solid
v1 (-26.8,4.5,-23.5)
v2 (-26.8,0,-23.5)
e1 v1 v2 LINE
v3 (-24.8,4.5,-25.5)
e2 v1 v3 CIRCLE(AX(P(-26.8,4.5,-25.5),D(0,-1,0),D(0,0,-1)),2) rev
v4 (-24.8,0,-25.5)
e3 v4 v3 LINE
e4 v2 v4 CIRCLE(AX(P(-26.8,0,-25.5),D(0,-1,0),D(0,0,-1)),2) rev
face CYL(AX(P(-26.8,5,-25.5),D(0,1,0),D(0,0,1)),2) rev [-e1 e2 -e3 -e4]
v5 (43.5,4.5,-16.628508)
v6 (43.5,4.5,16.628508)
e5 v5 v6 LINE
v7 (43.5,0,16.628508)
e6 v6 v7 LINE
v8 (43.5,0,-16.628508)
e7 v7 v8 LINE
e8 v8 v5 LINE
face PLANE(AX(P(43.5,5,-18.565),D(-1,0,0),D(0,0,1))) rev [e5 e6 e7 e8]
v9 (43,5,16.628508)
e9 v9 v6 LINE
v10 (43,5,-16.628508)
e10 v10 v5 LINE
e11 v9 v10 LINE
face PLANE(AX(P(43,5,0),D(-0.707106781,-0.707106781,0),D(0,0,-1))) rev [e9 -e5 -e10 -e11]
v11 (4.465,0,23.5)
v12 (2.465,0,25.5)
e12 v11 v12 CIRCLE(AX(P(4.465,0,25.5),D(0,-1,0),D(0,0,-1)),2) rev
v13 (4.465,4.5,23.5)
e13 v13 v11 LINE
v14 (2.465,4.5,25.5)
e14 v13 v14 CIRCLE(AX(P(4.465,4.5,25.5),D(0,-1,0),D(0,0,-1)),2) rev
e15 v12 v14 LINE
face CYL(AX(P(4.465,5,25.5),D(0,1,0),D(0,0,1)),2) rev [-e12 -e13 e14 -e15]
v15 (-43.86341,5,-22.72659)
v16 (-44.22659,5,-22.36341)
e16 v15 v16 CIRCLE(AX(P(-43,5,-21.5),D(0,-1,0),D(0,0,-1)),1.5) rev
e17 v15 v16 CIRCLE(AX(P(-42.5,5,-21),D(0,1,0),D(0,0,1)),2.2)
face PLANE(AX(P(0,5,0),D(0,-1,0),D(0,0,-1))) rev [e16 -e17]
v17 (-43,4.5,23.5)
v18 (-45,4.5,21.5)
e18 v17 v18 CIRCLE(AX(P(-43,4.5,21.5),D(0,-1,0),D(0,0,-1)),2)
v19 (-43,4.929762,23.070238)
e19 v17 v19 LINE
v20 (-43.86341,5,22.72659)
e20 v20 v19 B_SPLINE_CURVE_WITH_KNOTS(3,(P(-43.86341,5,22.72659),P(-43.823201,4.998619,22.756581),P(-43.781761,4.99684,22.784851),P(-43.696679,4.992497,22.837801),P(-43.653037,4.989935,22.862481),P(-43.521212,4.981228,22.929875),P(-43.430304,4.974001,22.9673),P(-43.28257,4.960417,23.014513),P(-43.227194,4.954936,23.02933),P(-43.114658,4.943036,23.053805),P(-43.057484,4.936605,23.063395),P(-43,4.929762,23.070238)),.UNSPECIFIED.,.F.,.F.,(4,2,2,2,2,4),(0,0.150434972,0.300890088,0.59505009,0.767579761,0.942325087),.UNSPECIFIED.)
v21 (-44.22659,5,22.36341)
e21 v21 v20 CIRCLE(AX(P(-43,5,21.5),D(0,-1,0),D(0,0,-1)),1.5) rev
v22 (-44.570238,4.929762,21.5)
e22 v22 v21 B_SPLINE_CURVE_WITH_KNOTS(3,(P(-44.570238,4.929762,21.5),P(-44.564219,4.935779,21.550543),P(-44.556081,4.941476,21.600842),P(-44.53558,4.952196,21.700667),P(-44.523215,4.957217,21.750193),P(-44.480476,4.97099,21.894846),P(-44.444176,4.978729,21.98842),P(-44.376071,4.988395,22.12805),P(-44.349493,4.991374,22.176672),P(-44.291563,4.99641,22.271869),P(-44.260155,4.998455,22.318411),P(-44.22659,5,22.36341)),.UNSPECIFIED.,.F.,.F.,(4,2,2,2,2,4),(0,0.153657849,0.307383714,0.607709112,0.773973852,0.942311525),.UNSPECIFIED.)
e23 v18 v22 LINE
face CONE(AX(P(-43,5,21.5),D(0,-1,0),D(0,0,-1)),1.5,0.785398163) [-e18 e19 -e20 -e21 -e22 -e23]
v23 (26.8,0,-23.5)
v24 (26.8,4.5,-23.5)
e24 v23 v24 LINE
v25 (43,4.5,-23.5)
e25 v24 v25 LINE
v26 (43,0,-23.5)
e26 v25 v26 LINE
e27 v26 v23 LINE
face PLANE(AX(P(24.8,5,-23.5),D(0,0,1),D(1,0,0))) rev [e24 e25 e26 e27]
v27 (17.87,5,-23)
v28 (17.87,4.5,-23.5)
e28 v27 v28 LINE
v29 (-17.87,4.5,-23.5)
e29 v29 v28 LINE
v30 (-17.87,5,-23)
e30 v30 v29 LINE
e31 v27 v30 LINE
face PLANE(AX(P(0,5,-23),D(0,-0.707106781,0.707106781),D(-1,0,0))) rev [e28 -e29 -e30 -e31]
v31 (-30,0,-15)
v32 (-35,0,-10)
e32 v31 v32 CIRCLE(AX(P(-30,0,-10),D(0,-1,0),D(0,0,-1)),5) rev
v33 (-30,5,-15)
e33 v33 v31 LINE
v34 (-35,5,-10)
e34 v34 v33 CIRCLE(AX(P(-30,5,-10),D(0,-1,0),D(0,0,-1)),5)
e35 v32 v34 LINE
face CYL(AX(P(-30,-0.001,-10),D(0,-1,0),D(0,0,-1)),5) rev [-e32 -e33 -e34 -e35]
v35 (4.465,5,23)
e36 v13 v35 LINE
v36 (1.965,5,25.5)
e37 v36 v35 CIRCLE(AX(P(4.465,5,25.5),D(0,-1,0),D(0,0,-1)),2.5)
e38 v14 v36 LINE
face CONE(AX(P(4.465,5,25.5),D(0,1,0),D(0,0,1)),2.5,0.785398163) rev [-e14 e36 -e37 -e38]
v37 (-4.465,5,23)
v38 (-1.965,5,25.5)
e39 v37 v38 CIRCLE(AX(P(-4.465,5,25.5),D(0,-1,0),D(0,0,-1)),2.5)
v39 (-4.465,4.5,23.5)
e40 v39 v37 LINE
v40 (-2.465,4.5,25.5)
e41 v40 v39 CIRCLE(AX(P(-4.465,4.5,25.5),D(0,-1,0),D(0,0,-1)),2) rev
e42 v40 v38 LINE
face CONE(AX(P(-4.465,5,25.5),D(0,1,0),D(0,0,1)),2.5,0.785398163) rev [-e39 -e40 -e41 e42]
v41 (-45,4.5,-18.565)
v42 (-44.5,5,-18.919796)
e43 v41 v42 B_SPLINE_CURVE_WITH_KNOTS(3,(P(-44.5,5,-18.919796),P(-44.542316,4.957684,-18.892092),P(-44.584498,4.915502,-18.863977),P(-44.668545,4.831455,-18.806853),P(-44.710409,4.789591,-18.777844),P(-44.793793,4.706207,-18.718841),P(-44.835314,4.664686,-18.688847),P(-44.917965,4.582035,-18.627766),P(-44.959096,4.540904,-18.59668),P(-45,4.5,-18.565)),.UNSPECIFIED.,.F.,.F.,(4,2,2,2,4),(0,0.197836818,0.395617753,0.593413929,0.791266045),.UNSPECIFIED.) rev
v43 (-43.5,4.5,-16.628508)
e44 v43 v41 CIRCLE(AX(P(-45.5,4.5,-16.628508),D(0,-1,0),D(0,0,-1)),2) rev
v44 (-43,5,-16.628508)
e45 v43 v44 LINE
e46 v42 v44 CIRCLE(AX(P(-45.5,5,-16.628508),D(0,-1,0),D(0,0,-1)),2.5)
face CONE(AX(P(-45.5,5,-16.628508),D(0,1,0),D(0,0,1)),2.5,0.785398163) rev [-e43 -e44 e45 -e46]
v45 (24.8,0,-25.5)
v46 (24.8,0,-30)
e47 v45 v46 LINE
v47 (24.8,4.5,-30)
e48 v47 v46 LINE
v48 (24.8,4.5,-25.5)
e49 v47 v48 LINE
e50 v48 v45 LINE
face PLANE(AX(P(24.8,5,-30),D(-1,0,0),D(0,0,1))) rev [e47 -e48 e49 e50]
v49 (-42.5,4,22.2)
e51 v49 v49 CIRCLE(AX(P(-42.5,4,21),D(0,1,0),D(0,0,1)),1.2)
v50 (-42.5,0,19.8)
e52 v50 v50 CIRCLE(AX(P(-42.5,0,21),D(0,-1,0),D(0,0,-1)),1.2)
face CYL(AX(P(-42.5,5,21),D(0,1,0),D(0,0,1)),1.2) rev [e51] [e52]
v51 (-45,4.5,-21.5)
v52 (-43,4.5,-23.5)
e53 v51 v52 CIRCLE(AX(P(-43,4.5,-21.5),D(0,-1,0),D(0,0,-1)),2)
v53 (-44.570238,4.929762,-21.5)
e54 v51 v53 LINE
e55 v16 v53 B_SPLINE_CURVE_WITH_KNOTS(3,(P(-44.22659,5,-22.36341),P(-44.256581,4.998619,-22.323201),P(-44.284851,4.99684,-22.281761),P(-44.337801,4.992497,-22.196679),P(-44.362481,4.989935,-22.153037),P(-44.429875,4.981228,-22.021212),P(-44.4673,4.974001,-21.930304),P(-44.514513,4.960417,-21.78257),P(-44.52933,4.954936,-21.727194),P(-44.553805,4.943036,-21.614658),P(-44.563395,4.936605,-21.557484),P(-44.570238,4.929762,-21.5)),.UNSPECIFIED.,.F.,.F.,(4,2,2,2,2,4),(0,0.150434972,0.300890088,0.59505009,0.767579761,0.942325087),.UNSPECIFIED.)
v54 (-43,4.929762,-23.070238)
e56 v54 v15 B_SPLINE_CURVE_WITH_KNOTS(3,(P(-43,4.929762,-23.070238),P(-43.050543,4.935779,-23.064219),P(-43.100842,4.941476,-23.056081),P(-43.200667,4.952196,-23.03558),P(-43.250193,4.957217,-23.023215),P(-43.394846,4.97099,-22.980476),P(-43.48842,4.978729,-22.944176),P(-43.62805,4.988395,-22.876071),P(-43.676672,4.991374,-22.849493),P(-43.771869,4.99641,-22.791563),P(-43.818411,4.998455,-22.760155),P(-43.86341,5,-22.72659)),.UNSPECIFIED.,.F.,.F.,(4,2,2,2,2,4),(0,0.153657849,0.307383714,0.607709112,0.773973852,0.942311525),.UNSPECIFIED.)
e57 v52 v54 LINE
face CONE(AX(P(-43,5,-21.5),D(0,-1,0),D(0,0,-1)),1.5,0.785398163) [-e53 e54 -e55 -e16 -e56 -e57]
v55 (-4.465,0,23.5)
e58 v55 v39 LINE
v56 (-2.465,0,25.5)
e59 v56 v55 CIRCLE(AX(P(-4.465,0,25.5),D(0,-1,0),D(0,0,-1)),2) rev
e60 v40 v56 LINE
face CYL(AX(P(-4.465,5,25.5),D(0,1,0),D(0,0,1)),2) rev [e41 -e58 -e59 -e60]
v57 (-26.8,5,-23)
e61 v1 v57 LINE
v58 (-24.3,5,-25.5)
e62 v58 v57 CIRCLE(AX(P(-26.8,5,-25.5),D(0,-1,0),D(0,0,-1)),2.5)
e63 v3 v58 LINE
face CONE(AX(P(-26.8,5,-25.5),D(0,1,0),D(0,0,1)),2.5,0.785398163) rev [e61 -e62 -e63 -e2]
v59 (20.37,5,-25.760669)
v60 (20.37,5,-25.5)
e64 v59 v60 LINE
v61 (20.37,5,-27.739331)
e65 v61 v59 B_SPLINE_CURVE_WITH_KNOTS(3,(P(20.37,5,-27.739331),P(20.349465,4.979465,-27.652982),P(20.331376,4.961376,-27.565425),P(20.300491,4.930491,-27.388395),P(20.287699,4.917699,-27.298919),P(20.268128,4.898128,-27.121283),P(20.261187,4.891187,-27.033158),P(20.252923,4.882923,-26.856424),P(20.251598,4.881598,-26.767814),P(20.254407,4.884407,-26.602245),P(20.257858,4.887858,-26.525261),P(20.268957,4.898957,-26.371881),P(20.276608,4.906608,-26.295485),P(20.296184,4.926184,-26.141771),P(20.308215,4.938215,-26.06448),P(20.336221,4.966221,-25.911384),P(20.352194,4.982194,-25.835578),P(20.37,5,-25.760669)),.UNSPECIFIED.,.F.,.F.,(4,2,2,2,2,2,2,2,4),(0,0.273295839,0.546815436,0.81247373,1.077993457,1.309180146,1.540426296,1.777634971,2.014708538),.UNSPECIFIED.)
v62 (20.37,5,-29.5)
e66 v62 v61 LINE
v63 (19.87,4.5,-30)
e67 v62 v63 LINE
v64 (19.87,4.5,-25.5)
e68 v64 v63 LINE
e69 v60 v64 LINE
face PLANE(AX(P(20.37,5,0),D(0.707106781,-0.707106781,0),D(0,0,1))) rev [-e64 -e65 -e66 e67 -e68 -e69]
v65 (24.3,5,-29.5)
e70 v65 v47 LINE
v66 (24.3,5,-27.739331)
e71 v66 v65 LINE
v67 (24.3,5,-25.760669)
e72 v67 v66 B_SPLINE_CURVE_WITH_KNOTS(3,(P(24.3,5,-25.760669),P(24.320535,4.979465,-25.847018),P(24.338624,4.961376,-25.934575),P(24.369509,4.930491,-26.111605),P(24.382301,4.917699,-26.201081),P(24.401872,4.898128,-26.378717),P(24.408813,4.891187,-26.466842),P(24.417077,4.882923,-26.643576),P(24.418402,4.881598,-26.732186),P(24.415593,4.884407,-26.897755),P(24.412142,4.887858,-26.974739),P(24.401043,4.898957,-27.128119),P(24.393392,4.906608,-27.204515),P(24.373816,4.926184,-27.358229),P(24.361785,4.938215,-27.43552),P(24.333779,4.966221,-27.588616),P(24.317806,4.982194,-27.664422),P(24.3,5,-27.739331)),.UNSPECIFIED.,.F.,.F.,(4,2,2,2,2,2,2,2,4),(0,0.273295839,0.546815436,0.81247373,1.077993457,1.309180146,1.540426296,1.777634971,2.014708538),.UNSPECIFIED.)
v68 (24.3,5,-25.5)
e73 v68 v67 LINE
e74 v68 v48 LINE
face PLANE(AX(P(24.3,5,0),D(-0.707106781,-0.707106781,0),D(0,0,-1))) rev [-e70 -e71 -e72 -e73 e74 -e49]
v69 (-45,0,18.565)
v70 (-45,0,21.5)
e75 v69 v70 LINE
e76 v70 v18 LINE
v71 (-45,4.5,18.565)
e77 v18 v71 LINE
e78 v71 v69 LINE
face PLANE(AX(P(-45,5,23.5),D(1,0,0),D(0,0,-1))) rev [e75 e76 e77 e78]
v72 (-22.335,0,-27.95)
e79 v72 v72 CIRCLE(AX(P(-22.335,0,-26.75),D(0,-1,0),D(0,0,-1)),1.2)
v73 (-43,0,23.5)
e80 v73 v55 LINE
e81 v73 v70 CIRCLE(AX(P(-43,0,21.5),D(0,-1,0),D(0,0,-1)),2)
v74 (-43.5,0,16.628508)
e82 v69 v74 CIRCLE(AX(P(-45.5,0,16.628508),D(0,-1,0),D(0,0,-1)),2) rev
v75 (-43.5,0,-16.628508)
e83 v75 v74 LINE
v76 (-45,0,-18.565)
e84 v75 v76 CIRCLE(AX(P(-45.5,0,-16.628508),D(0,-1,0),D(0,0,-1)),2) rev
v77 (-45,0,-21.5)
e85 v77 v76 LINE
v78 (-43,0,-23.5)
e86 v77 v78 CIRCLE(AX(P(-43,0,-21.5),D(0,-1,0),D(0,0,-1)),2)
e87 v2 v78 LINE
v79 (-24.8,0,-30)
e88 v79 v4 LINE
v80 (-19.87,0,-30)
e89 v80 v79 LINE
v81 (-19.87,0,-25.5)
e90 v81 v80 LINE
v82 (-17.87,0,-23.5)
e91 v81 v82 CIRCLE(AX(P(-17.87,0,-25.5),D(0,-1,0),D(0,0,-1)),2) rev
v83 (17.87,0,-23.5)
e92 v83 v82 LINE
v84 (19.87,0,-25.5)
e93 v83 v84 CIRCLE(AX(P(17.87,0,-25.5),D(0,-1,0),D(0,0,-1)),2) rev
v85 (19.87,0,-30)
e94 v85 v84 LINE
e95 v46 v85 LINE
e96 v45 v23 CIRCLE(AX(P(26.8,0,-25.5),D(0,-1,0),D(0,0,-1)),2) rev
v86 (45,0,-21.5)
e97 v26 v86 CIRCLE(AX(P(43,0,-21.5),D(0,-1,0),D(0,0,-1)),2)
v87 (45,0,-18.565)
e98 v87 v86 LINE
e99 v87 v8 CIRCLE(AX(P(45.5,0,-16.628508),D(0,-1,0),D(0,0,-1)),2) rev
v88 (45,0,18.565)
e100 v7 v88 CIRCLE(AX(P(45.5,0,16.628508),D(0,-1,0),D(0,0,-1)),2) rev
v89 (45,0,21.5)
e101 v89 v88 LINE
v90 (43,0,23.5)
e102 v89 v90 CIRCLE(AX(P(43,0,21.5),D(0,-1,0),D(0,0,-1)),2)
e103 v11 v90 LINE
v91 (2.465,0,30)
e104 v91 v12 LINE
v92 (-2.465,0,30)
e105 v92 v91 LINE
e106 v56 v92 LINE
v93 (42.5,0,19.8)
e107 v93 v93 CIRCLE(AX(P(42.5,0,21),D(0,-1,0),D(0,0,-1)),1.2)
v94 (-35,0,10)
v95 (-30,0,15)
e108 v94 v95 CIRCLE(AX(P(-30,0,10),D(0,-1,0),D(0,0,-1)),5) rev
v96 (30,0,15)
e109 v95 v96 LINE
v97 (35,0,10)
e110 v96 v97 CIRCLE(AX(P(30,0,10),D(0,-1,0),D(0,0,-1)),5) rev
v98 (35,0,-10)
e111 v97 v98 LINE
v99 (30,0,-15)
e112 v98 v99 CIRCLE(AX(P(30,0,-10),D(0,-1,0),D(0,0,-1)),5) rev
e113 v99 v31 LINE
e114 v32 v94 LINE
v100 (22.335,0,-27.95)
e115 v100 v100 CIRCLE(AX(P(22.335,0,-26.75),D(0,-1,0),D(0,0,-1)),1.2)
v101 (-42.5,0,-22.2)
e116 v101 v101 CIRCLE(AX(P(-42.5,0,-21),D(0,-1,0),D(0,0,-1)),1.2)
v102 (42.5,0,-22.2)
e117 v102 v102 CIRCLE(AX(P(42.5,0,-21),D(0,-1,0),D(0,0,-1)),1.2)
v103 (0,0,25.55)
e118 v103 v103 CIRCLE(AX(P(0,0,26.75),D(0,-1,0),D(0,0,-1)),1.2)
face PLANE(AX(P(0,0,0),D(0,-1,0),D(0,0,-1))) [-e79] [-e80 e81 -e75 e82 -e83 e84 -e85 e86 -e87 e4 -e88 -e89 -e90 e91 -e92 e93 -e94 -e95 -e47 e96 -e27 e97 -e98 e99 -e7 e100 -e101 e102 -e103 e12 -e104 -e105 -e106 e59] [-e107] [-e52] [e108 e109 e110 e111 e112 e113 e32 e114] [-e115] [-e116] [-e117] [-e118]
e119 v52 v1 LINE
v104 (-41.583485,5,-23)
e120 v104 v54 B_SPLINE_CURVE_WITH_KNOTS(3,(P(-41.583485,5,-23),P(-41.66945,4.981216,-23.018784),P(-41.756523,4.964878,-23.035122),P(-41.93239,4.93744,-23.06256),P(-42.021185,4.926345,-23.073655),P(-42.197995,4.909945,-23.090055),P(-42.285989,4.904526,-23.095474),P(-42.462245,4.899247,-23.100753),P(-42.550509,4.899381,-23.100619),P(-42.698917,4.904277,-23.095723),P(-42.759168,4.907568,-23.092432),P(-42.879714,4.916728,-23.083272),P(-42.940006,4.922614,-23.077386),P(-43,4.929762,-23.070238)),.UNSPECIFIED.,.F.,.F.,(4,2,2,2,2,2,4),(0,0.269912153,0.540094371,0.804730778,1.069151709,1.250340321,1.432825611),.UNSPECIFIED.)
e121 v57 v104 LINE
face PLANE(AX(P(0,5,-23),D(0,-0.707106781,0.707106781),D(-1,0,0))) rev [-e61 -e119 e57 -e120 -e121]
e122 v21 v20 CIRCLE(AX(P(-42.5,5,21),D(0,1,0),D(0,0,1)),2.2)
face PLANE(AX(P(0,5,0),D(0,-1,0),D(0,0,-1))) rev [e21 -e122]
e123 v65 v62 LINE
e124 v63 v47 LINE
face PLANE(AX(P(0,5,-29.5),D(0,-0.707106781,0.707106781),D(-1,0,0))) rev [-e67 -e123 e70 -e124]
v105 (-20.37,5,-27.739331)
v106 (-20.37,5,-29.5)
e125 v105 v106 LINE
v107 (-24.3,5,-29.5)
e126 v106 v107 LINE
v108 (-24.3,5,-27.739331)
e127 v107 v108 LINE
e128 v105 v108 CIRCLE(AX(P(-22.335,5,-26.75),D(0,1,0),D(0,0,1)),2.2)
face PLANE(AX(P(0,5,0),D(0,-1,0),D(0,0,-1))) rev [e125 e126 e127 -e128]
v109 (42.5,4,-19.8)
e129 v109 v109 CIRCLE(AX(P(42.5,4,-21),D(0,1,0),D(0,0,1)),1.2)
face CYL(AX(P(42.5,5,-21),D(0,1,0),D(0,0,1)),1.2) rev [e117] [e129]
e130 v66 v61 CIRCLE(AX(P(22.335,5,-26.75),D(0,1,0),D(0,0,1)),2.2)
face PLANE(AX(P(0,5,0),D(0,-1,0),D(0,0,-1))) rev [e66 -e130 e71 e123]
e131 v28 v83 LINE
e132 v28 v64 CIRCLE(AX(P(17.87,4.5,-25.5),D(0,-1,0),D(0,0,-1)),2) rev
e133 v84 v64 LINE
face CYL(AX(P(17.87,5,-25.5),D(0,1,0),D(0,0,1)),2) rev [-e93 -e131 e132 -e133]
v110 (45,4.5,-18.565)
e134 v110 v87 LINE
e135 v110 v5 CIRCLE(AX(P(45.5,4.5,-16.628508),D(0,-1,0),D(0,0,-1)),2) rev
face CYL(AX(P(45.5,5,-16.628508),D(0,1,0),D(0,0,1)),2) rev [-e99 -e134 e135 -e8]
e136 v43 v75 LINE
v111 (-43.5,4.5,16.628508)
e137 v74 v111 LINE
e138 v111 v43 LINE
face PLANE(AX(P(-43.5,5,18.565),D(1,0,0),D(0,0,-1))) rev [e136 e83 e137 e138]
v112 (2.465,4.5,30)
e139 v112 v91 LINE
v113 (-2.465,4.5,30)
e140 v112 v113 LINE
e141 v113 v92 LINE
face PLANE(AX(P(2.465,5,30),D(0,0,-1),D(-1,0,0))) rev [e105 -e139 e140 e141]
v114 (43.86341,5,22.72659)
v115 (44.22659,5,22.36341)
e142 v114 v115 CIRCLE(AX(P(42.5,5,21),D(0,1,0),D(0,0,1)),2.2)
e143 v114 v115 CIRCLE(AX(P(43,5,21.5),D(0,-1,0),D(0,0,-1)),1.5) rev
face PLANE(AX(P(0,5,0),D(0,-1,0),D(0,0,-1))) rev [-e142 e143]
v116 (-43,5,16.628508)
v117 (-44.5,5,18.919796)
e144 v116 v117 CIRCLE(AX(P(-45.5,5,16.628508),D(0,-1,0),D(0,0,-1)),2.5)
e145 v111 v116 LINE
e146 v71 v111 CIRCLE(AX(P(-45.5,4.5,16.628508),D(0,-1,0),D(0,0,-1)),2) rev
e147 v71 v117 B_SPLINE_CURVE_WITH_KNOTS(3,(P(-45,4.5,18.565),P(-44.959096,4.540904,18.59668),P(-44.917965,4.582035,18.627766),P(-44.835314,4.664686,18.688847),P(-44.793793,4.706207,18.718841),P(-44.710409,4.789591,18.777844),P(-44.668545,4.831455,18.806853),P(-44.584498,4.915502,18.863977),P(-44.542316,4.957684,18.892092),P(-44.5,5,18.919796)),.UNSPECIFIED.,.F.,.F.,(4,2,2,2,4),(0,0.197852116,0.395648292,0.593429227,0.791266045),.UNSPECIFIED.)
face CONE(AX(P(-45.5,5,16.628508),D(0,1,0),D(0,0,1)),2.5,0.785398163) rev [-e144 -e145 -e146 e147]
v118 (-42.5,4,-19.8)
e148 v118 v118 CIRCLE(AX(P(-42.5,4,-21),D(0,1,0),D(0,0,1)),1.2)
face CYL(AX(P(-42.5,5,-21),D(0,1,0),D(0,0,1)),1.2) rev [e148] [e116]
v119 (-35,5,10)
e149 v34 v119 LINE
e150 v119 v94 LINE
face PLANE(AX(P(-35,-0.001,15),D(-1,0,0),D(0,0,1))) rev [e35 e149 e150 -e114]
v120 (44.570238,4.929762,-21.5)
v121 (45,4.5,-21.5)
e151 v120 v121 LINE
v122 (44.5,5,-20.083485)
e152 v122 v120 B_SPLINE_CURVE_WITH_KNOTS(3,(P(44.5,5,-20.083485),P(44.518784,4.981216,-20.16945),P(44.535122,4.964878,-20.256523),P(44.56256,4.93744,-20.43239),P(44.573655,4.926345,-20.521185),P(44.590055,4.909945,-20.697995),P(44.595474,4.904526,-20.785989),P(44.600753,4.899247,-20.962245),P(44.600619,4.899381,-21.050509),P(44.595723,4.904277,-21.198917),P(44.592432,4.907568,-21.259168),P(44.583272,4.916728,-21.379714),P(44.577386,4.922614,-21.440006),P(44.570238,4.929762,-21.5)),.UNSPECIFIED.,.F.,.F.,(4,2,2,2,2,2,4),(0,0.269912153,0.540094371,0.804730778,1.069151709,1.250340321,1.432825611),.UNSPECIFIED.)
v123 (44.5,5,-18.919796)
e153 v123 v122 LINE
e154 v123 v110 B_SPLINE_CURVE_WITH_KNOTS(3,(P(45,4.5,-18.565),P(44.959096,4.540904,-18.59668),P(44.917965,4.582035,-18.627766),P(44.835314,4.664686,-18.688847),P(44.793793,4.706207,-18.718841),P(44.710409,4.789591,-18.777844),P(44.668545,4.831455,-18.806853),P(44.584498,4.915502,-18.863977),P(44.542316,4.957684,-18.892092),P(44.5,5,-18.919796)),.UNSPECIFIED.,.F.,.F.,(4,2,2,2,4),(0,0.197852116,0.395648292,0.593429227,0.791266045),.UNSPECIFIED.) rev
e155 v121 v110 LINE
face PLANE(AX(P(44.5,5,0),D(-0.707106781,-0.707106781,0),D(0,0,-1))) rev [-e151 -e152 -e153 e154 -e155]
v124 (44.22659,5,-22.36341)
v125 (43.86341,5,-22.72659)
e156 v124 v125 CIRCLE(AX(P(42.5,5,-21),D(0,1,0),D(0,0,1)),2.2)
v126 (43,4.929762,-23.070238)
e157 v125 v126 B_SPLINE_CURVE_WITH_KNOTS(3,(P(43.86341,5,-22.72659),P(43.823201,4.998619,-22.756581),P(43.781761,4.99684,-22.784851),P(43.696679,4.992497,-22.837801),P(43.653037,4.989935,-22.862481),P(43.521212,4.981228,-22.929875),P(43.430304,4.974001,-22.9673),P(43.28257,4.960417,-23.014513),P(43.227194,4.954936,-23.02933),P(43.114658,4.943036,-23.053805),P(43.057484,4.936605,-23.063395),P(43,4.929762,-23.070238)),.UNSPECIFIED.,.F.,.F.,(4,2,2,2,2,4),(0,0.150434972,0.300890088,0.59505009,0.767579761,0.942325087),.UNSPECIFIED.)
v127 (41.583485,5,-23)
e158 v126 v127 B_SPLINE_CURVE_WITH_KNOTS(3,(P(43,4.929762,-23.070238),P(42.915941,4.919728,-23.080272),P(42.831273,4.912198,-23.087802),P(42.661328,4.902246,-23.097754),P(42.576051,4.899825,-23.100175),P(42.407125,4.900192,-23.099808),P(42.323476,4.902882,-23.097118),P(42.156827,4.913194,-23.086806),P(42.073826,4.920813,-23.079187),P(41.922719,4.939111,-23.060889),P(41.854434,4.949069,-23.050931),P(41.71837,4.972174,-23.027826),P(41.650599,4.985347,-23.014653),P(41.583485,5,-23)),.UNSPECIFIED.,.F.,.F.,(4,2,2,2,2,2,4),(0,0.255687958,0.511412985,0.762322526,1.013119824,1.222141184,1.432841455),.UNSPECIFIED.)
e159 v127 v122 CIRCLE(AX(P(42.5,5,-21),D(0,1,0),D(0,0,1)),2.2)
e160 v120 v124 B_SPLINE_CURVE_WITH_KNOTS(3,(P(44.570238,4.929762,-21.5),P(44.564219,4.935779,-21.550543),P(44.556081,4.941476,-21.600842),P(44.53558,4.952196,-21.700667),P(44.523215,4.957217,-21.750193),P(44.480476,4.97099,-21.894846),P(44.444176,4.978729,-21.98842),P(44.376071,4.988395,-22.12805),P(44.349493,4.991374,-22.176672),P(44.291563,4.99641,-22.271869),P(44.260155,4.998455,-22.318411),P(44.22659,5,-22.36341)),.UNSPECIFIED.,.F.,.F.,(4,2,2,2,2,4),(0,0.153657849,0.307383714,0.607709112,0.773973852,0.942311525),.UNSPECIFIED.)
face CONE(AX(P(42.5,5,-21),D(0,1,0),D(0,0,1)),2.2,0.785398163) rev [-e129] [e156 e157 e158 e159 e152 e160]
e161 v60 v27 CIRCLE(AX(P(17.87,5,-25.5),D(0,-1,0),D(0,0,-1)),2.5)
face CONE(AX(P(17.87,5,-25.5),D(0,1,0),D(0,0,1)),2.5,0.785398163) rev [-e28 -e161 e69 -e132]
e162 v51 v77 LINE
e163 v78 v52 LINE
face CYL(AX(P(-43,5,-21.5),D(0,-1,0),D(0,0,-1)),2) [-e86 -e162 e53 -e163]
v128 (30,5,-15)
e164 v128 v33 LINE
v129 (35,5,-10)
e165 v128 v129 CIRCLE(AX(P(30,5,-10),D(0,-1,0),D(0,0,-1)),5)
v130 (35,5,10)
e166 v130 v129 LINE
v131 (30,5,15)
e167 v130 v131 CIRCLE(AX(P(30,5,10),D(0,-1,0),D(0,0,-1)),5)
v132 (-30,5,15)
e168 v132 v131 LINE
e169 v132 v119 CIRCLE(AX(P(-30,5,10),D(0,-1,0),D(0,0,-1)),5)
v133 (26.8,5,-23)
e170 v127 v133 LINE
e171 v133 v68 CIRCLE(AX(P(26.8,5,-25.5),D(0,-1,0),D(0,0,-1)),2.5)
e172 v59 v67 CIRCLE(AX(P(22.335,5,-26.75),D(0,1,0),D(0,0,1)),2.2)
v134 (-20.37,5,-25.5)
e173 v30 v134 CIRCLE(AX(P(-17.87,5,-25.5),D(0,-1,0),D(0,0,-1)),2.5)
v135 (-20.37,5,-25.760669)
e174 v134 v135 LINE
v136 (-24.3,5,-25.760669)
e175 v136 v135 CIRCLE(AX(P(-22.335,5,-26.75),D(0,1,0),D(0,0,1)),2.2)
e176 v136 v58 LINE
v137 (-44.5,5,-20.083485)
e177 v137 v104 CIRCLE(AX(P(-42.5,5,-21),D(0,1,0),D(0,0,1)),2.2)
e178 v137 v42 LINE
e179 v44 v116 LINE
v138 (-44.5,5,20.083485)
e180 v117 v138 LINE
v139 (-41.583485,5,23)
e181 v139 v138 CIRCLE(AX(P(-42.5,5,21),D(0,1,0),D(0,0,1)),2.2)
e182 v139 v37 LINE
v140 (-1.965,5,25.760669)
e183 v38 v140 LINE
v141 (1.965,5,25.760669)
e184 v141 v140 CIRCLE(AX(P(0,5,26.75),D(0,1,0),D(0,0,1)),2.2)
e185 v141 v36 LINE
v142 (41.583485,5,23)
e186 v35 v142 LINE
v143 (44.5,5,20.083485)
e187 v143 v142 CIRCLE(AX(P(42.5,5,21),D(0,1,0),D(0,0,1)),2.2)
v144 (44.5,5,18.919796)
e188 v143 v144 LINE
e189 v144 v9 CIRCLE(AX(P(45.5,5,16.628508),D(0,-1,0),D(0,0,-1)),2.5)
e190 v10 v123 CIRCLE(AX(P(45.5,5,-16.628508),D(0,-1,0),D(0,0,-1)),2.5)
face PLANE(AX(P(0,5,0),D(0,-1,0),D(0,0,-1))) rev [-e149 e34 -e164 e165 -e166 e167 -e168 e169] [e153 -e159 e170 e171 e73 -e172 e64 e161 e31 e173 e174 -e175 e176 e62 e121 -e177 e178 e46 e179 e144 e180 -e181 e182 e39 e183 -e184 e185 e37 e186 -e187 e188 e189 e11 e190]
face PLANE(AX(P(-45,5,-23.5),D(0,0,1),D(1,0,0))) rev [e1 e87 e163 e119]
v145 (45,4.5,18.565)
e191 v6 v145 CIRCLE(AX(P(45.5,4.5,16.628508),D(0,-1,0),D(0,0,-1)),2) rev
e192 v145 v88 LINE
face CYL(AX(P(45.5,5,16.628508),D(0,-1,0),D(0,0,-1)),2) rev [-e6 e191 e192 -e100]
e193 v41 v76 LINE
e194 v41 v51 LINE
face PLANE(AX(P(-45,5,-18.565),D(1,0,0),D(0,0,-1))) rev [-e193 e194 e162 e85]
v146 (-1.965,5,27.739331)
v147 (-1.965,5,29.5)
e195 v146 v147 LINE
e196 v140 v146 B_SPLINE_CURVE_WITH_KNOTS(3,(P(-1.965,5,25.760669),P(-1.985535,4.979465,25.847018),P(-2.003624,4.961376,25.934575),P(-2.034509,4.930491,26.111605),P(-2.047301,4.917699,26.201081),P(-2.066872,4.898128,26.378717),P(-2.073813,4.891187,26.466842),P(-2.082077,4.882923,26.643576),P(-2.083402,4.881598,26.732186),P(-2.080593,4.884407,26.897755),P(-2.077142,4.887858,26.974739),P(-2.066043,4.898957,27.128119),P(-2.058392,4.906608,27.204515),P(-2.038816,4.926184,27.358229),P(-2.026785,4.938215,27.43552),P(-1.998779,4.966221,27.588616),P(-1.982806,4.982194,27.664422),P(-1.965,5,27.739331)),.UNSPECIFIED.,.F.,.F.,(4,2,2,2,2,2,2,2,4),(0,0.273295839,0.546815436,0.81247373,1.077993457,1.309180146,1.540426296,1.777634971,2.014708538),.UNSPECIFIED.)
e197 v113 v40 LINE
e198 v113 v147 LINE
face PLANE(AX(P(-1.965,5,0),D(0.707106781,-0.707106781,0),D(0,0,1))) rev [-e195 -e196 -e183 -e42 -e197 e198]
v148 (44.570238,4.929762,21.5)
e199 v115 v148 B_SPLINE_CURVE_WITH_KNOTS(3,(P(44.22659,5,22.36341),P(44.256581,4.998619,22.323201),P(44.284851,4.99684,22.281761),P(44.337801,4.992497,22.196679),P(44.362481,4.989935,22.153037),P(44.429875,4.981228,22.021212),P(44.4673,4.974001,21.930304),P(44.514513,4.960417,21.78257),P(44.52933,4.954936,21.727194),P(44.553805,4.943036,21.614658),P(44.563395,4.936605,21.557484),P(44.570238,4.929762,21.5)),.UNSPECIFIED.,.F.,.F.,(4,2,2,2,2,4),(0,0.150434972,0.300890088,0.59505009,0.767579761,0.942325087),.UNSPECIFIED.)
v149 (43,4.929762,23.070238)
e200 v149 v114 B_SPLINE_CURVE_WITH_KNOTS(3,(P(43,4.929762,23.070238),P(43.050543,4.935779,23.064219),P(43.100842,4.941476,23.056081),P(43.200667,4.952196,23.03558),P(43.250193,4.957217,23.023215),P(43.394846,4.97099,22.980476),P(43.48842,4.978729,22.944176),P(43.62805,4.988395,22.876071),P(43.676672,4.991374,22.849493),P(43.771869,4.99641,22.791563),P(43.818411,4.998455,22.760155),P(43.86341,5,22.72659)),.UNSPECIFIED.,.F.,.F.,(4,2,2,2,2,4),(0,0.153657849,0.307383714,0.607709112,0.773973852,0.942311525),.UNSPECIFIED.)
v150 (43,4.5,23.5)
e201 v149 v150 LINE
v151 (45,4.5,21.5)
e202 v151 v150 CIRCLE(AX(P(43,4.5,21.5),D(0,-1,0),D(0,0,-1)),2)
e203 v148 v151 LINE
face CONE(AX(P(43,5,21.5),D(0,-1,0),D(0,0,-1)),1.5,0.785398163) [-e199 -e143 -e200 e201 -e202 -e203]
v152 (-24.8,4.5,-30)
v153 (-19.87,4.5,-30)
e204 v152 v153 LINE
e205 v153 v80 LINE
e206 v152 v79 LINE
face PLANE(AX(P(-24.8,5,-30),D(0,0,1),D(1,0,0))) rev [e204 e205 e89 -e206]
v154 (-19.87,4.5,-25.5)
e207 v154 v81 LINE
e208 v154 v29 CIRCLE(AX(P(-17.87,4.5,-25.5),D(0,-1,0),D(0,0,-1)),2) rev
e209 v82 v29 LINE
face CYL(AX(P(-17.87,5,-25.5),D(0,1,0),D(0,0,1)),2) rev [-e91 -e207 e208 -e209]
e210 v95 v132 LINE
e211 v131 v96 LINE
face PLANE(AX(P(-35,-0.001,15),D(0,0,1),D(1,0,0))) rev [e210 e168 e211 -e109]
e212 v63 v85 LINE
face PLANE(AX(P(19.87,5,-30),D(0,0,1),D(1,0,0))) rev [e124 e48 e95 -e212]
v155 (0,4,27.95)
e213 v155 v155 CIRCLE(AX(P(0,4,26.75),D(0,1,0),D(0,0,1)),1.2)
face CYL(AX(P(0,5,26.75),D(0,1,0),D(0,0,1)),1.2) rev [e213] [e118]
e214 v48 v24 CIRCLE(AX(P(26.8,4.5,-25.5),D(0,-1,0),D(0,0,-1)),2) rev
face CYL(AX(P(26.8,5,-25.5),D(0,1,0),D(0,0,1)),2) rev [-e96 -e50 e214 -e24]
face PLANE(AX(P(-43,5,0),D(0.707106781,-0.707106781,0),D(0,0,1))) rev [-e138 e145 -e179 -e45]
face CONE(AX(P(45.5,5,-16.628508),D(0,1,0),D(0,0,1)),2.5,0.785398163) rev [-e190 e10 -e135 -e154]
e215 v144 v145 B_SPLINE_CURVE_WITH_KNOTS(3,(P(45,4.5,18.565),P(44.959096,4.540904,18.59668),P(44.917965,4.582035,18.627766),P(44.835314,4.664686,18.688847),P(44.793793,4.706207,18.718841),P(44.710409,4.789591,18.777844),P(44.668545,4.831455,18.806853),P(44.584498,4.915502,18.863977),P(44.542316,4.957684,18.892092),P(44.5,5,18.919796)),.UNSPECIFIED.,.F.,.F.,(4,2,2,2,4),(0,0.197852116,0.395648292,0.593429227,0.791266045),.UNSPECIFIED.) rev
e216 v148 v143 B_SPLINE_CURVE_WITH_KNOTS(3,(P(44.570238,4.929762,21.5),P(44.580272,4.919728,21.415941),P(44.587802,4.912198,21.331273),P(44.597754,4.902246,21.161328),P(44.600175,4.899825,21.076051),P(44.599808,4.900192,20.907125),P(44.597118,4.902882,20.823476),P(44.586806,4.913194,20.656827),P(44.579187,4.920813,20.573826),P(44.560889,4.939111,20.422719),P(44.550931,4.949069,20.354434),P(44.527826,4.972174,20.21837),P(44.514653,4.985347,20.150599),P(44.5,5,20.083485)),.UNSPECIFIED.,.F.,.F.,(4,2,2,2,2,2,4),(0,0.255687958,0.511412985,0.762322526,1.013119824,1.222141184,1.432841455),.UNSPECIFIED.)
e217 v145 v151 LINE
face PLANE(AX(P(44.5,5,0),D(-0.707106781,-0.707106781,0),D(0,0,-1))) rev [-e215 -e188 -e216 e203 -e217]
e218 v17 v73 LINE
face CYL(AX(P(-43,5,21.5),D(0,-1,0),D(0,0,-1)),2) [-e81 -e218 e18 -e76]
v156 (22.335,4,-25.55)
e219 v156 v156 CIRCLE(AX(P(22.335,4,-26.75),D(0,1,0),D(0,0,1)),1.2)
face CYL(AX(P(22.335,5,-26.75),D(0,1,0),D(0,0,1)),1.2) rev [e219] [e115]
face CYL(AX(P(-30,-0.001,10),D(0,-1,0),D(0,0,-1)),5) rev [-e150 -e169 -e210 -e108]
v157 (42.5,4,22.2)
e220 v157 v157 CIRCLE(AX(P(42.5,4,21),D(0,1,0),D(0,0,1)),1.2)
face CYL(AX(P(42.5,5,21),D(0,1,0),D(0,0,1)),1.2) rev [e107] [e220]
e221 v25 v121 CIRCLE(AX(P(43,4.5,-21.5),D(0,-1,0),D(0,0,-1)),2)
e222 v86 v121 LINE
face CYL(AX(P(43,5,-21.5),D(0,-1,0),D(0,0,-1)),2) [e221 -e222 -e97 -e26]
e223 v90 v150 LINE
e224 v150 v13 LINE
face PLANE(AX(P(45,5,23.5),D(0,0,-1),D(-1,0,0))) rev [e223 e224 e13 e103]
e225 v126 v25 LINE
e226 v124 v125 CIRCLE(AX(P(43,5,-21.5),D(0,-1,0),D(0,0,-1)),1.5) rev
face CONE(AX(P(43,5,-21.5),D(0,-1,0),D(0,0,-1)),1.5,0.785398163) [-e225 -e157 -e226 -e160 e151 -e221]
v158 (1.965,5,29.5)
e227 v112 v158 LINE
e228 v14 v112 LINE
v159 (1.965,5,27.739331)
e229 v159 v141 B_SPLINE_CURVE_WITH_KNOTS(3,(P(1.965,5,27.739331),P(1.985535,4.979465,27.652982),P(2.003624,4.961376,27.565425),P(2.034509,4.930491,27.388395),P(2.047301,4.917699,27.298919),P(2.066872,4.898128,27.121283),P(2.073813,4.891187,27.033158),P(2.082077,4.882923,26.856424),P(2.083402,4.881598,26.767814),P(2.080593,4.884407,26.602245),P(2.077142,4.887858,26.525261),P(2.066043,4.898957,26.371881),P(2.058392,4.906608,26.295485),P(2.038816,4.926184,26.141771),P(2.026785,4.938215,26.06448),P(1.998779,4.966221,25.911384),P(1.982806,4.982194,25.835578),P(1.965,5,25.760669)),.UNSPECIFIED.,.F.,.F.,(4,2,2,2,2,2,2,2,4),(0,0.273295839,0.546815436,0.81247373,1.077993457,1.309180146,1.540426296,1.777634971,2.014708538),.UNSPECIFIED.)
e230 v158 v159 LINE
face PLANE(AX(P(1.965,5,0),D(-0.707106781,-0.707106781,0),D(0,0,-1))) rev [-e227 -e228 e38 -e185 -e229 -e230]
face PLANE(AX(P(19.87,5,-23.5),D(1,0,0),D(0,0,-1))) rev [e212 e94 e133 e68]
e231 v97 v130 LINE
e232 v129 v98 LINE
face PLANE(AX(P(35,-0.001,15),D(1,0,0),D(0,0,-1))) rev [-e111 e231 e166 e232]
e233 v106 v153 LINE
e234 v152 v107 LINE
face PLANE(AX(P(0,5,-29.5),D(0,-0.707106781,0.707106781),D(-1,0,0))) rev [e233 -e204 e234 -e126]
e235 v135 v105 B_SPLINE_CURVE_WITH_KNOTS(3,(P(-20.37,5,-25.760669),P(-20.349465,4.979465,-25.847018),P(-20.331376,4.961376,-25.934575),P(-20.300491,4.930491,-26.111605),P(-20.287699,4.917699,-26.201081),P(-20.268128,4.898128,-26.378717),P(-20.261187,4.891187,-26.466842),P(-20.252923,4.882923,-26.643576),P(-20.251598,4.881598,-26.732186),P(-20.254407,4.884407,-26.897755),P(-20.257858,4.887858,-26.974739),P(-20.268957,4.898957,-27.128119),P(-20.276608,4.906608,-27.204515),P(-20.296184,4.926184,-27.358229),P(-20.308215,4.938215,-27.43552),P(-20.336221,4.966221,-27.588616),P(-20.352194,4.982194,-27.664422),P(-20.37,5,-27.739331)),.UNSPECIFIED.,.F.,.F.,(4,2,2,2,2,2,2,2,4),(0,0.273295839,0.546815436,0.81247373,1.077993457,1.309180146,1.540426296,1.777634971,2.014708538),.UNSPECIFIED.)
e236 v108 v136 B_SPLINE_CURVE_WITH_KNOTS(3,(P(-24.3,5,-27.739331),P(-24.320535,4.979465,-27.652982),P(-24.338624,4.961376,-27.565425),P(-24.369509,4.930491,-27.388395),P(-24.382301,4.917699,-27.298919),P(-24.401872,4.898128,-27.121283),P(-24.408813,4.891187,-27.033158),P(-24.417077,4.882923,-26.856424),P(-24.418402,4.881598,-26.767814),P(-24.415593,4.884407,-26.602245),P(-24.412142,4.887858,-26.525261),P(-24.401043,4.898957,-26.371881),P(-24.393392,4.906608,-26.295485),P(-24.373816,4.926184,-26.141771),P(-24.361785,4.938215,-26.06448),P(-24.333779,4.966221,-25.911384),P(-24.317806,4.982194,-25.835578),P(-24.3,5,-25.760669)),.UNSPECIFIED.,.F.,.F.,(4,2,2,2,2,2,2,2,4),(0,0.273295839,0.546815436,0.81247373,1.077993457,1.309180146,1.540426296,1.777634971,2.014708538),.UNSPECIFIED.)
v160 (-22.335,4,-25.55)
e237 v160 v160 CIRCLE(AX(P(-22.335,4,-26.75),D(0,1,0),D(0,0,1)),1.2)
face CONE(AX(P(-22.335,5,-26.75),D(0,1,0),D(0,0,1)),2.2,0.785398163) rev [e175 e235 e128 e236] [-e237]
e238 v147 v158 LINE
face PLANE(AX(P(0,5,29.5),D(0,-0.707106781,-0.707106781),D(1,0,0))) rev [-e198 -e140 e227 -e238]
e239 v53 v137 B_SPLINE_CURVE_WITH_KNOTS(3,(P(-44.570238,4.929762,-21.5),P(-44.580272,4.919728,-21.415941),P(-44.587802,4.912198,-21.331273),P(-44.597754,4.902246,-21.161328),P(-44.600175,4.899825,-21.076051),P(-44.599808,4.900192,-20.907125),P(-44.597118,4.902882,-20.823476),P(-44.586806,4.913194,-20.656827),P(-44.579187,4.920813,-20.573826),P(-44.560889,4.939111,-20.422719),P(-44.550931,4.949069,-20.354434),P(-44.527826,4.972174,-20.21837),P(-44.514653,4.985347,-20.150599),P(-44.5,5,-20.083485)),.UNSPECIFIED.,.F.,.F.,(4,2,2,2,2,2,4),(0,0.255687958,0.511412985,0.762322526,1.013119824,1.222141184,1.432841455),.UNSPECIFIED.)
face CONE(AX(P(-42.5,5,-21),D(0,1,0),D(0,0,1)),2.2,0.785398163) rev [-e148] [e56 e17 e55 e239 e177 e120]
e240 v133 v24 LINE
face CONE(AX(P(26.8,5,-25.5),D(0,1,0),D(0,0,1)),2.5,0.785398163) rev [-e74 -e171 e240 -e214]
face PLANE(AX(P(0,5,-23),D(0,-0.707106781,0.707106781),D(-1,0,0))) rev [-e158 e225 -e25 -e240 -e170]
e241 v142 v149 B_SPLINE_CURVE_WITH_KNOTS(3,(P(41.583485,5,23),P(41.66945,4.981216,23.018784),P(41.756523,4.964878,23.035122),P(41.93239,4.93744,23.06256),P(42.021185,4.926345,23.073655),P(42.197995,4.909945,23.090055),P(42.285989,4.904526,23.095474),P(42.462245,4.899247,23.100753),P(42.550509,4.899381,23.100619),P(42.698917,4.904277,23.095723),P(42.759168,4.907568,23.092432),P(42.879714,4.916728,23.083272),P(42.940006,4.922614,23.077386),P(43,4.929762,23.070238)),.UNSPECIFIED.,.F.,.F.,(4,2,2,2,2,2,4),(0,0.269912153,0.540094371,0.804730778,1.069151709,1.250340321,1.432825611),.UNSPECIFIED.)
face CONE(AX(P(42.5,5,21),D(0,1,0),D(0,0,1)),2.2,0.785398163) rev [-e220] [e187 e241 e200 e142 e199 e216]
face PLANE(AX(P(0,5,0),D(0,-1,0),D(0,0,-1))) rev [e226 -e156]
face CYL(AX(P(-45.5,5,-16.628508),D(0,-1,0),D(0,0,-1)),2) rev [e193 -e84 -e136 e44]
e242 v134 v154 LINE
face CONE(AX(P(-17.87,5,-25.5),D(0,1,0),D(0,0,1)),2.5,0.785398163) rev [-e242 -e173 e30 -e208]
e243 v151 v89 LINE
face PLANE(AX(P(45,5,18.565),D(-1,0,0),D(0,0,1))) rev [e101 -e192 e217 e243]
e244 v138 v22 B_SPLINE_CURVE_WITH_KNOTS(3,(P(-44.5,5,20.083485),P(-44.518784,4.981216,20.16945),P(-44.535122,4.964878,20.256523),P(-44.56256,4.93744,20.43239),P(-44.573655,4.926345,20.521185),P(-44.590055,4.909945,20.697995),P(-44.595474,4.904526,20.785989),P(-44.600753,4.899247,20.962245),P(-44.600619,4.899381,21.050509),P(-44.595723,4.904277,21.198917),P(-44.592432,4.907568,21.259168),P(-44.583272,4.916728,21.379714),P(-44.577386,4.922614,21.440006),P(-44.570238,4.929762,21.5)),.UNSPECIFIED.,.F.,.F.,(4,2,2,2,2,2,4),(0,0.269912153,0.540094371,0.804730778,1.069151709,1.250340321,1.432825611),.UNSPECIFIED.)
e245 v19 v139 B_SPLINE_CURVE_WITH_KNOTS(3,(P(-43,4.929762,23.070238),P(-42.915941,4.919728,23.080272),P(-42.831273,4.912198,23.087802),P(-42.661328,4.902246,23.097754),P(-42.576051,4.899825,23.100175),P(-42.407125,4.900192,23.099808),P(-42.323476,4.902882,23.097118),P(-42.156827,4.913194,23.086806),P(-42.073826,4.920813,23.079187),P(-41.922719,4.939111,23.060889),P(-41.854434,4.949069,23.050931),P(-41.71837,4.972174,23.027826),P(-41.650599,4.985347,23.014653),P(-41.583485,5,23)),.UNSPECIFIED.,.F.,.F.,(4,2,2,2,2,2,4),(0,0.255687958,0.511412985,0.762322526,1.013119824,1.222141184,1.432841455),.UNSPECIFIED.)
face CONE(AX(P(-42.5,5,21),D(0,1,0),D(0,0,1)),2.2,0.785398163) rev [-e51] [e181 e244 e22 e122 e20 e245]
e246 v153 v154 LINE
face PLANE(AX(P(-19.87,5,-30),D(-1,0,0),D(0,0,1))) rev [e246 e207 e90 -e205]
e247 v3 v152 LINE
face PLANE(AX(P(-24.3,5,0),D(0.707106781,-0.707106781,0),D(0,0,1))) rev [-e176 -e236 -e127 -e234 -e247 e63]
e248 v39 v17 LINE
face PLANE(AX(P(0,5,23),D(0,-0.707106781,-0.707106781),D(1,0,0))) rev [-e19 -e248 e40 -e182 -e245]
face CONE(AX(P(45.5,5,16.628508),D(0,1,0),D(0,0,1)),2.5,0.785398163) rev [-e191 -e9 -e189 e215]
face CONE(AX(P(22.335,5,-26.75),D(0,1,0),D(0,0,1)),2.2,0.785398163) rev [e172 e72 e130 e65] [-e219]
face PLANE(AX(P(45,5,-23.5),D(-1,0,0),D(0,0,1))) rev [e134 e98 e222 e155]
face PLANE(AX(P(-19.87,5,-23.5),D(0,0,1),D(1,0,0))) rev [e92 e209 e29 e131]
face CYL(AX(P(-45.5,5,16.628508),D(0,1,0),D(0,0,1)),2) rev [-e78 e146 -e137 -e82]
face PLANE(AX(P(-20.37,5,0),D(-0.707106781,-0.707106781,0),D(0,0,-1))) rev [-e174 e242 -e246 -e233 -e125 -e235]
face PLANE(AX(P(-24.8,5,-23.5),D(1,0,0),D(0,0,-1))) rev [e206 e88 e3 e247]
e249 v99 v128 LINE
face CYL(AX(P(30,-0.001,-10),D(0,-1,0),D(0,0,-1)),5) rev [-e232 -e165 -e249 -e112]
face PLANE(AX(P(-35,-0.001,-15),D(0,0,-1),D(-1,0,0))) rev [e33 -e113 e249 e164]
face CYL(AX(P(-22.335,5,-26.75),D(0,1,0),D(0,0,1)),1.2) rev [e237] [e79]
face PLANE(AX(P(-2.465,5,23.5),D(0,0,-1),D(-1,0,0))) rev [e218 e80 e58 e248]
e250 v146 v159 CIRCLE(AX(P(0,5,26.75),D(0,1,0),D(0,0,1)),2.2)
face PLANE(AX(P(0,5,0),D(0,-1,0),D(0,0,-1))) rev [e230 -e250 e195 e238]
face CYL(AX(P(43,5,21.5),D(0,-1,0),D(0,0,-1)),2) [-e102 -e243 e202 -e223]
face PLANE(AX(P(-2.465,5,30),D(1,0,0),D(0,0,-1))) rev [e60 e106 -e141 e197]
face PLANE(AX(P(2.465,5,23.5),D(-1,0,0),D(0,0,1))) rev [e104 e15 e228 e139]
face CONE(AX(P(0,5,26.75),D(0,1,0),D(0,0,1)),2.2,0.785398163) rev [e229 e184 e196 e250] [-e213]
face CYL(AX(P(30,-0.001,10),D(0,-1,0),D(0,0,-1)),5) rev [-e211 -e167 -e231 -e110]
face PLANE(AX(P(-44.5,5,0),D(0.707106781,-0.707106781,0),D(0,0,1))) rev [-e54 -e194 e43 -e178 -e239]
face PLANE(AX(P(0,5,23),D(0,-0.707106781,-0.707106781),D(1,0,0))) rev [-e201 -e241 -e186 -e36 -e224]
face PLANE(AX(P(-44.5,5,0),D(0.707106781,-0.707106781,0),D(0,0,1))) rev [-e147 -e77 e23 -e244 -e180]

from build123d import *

# Parameters (mm, degrees)
BOSS_EXTRUDE1_DEPTH                                 = 5
CSK_FOR_M2_COUNTERSUNK_FLAT_HEAD_SCREW1_D           = 2.4
CSK_FOR_M2_COUNTERSUNK_FLAT_HEAD_SCREW1_CSINK_D     = 4.4
CSK_FOR_M2_COUNTERSUNK_FLAT_HEAD_SCREW1_CSINK_ANGLE = 90
FILLET2_R                                           = 2
CHAMFER2_SIZE                                       = 0.5
CUT_EXTRUDE1_REACH                                  = 56.314
SKETCH4_W                                           = 70
SKETCH4_H                                           = 30
FILLET3_R                                           = 5


with BuildPart() as part:
    # Sketch1 → Boss-Extrude1 (new body)
    with BuildSketch(Plane(origin=(0, 0, 0), x_dir=(1, 0, 0), z_dir=(0, 1, 0))):
        Polygon((-45, -23.5), (-45, -18.565), (-43.5, -18.565), (-43.5, 18.565), (-45, 18.565), (-45, 23.5), (-24.8, 23.5), (-24.8, 30), (-19.87, 30), (-19.87, 23.5), (19.87, 23.5), (19.87, 30), (24.8, 30), (24.8, 23.5), (45, 23.5), (45, 18.565), (43.5, 18.565), (43.5, -18.565), (45, -18.565), (45, -23.5), (2.465, -23.5), (2.465, -30), (-2.465, -30), (-2.465, -23.5), align=None)
    extrude(amount=BOSS_EXTRUDE1_DEPTH)

    # CSK for M2 Countersunk Flat Head Screw1 (through all)
    with Locations(Plane(origin=(0, 5, 0), x_dir=(1, 0, 0), z_dir=(0, 1, 0))):
        with Locations((0, -26.75), (22.335, 26.75), (-22.335, 26.75), (-42.5, 21), (-42.5, -21), (42.5, 21), (42.5, -21)):
            CounterSinkHole(CSK_FOR_M2_COUNTERSUNK_FLAT_HEAD_SCREW1_D / 2, CSK_FOR_M2_COUNTERSUNK_FLAT_HEAD_SCREW1_CSINK_D / 2, counter_sink_angle=CSK_FOR_M2_COUNTERSUNK_FLAT_HEAD_SCREW1_CSINK_ANGLE)

    # Fillet2
    # the kernel refuses this fillet: 2 mm, written as the material it adds along each edge
    with BuildSketch(Plane(origin=(-2.465, 0, 23.5), x_dir=(0, 0, 1), z_dir=(0, 1, 0))) as fillet2_piece_1:
        with BuildLine():
            CenterArc((FILLET2_R, -FILLET2_R), FILLET2_R, 90, 90)
            Line((0, -FILLET2_R), (0, 0))
            Line((0, 0), (FILLET2_R, 0))
        make_face()
    extrude(amount=5)
    with BuildSketch(Plane(origin=(-43.5, 0, 18.565), x_dir=(0, 0, -1), z_dir=(0, 1, 0)), Plane(origin=(43.5, 0, -18.565), x_dir=(0, 0, 1), z_dir=(0, 1, 0))) as fillet2_piece_2:
        with BuildLine():
            CenterArc((1.936491673, 2), FILLET2_R, 194.477512186, 75.522487814)
            Line((0, 1.5), (0, 0))
            Line((0, 0), (1.936491673, 0))
        make_face()
    extrude(amount=5)
    with BuildSketch(Plane(origin=(-43.5, 0, -18.565), x_dir=(-1, 0, 0), z_dir=(0, 1, 0)), Plane(origin=(43.5, 0, 18.565), x_dir=(1, 0, 0), z_dir=(0, 1, 0))) as fillet2_piece_3:
        with BuildLine():
            CenterArc((2, 1.936491673), FILLET2_R, 180, 75.522487814)
            Line((0, 1.936491673), (0, 0))
            Line((0, 0), (1.5, 0))
        make_face()
    extrude(amount=5)
    with BuildSketch(Plane(origin=(-24.8, 0, -23.5), x_dir=(0, 0, -1), z_dir=(0, 1, 0)), Plane(origin=(-19.87, 0, -23.5), x_dir=(1, 0, 0), z_dir=(0, 1, 0)), Plane(origin=(19.87, 0, -23.5), x_dir=(0, 0, -1), z_dir=(0, 1, 0)), Plane(origin=(24.8, 0, -23.5), x_dir=(1, 0, 0), z_dir=(0, 1, 0)), Plane(origin=(2.465, 0, 23.5), x_dir=(0, 0, 1), z_dir=(0, 1, 0))) as fillet2_piece_4:
        with BuildLine():
            CenterArc((FILLET2_R, FILLET2_R), FILLET2_R, 180, 90)
            Line((0, FILLET2_R), (0, 0))
            Line((0, 0), (FILLET2_R, 0))
        make_face()
    extrude(amount=5)
    # the kernel refuses this fillet: 2 mm, written as the material it takes off along each edge
    with BuildSketch(Plane(origin=(-45, -5, 23.5), x_dir=(0, 0, -1), z_dir=(0, 1, 0)), Plane(origin=(45, -5, -23.5), x_dir=(0, 0, 1), z_dir=(0, 1, 0)), Plane(origin=(45, -5, 23.5), x_dir=(-1, 0, 0), z_dir=(0, 1, 0))) as fillet2_2_piece_1:
        with BuildLine():
            CenterArc((FILLET2_R, -FILLET2_R), FILLET2_R, 90, 90)
            Line((0, -FILLET2_R), (0, 0))
            Line((0, 0), (FILLET2_R, 0))
        make_face()
    extrude(amount=15, mode=Mode.SUBTRACT)
    with BuildSketch(Plane(origin=(-45, -5, -23.5), x_dir=(0, 0, 1), z_dir=(0, 1, 0))) as fillet2_2_piece_2:
        with BuildLine():
            CenterArc((FILLET2_R, FILLET2_R), FILLET2_R, 180, 90)
            Line((0, FILLET2_R), (0, 0))
            Line((0, 0), (FILLET2_R, 0))
        make_face()
    extrude(amount=15, mode=Mode.SUBTRACT)

    # Chamfer2
    # the kernel refuses this chamfer: 0.5 mm, written as the material it takes off along each edge
    with BuildSketch(Plane(origin=(-2.465, 5, 31.285841494), x_dir=(1, 0, 0), z_dir=(0, 0, -1)), Plane(origin=(24.8, 5, -31.285841494), x_dir=(-1, 0, 0), z_dir=(0, 0, 1)), Plane(origin=(-19.87, 5, -31.285841494), x_dir=(-1, 0, 0), z_dir=(0, 0, 1)), Plane(origin=(19.87, 5, -25.5), x_dir=(1, 0, 0), z_dir=(0, 0, -1)), Plane(origin=(2.465, 5, 25.5), x_dir=(-1, 0, 0), z_dir=(0, 0, 1))) as chamfer2_piece_1:
        Polygon((CHAMFER2_SIZE, 0), (0, CHAMFER2_SIZE), (0, 0), align=None)
    extrude(amount=5.785841494, mode=Mode.SUBTRACT)
    with BuildSketch(Plane(origin=(-4.465, 5, 23.5), x_dir=(0, 0, -1), z_dir=(-1, 0, 0)), Plane(origin=(43, 5, 23.5), x_dir=(0, 0, -1), z_dir=(-1, 0, 0))) as chamfer2_piece_2:
        Polygon((CHAMFER2_SIZE, 0), (0, CHAMFER2_SIZE), (0, 0), align=None)
    extrude(amount=38.535, mode=Mode.SUBTRACT)
    with BuildSketch(Plane(origin=(18.584158506, 5, -30), x_dir=(0, 0, 1), z_dir=(1, 0, 0)), Plane(origin=(-26.085841494, 5, -30), x_dir=(0, 0, 1), z_dir=(1, 0, 0)), Plane(origin=(3.750841494, 5, 30), x_dir=(0, 0, -1), z_dir=(-1, 0, 0))) as chamfer2_piece_3:
        Polygon((CHAMFER2_SIZE, 0), (0, CHAMFER2_SIZE), (0, 0), align=None)
    extrude(amount=7.501682988, mode=Mode.SUBTRACT)
    with BuildSketch(Plane(origin=(26.8, 5, -23.5), x_dir=(0, 0, 1), z_dir=(1, 0, 0))) as chamfer2_piece_4:
        Polygon((CHAMFER2_SIZE, 0), (0, CHAMFER2_SIZE), (0, 0), align=None)
    extrude(amount=16.2, mode=Mode.SUBTRACT)
    with BuildSketch(Plane(origin=(-17.87, 5, -23.5), x_dir=(0, 0, 1), z_dir=(1, 0, 0))) as chamfer2_piece_5:
        Polygon((CHAMFER2_SIZE, 0), (0, CHAMFER2_SIZE), (0, 0), align=None)
    extrude(amount=35.74, mode=Mode.SUBTRACT)
    with BuildSketch(Plane(origin=(-43, 5, -23.5), x_dir=(0, -1, 0), z_dir=(1, 0, 0))) as chamfer2_piece_6:
        Polygon((CHAMFER2_SIZE, 0), (0, -CHAMFER2_SIZE), (0, 0), align=None)
    extrude(amount=16.2, mode=Mode.SUBTRACT)
    with BuildSketch(Plane(origin=(-45, 5, -17.279158506), x_dir=(1, 0, 0), z_dir=(0, 0, -1)), Plane(origin=(45, 5, 17.279158506), x_dir=(-1, 0, 0), z_dir=(0, 0, 1)), Plane(origin=(45, 5, -21.5), x_dir=(-1, 0, 0), z_dir=(0, 0, 1)), Plane(origin=(-45, 5, 21.5), x_dir=(1, 0, 0), z_dir=(0, 0, -1))) as chamfer2_piece_7:
        Polygon((CHAMFER2_SIZE, 0), (0, CHAMFER2_SIZE), (0, 0), align=None)
    extrude(amount=4.220841494, mode=Mode.SUBTRACT)
    with BuildSketch(Plane(origin=(-43.5, 5, 16.628508327), x_dir=(1, 0, 0), z_dir=(0, 0, -1)), Plane(origin=(43.5, 5, -16.628508327), x_dir=(-1, 0, 0), z_dir=(0, 0, 1))) as chamfer2_piece_8:
        Polygon((CHAMFER2_SIZE, 0), (0, CHAMFER2_SIZE), (0, 0), align=None)
    extrude(amount=33.257016654, mode=Mode.SUBTRACT)
    with BuildSketch(Plane(origin=(43, 5, 21.5), x_dir=(1, 0, 0), z_dir=(0, 0, -1))) as chamfer2_piece_9:
        Polygon((2 - CHAMFER2_SIZE, 0), (2, CHAMFER2_SIZE), (2, 0), align=None)
    revolve(axis=Axis((43, 5, 21.5), (0, -1, 0)), revolution_arc=90, mode=Mode.SUBTRACT)
    with BuildSketch(Plane(origin=(43, 5, -21.5), x_dir=(0, 0, -1), z_dir=(-1, 0, 0))) as chamfer2_piece_10:
        Polygon((2 - CHAMFER2_SIZE, 0), (2, CHAMFER2_SIZE), (2, 0), align=None)
    revolve(axis=Axis((43, 5, -21.5), (0, -1, 0)), revolution_arc=90, mode=Mode.SUBTRACT)
    with BuildSketch(Plane(origin=(-43, 5, -21.5), x_dir=(-1, 0, 0), z_dir=(0, 0, 1))) as chamfer2_piece_11:
        Polygon((2 - CHAMFER2_SIZE, 0), (2, CHAMFER2_SIZE), (2, 0), align=None)
    revolve(axis=Axis((-43, 5, -21.5), (0, -1, 0)), revolution_arc=90, mode=Mode.SUBTRACT)
    with BuildSketch(Plane(origin=(-43, 5, 21.5), x_dir=(0, 0, 1), z_dir=(1, 0, 0))) as chamfer2_piece_12:
        Polygon((2 - CHAMFER2_SIZE, 0), (2, CHAMFER2_SIZE), (2, 0), align=None)
    revolve(axis=Axis((-43, 5, 21.5), (0, -1, 0)), revolution_arc=90, mode=Mode.SUBTRACT)
    with BuildSketch(Plane(origin=(-4.465, 5, 25.5), x_dir=(1, 0, 0), z_dir=(0, 0, 1))) as chamfer2_piece_13:
        Polygon((2 + CHAMFER2_SIZE, 0), (2, -CHAMFER2_SIZE), (2, 0), align=None)
    revolve(axis=Axis((-4.465, 5, 25.5), (0, 1, 0)), revolution_arc=90, mode=Mode.SUBTRACT)
    with BuildSketch(Plane(origin=(-45.5, 5, 16.628508327), x_dir=(-0.38057900366880315, 0, 0.92474841009134), z_dir=(-0.92474841009134, 0, -0.38057900366880315))) as chamfer2_piece_14:
        Polygon((2 + CHAMFER2_SIZE, 0), (2, -CHAMFER2_SIZE), (2, 0), align=None)
    revolve(axis=Axis((-45.5, 5, 16.628508327), (0, 1, 0)), revolution_arc=112.369552085, mode=Mode.SUBTRACT)
    with BuildSketch(Plane(origin=(-45.5, 5, -16.628508327), x_dir=(1, 0, 0), z_dir=(0, 0, 1))) as chamfer2_piece_15:
        Polygon((2 + CHAMFER2_SIZE, 0), (2, -CHAMFER2_SIZE), (2, 0), align=None)
    revolve(axis=Axis((-45.5, 5, -16.628508327), (0, 1, 0)), revolution_arc=112.369552085, mode=Mode.SUBTRACT)
    with BuildSketch(Plane(origin=(-26.8, 5, -25.5), x_dir=(0, 0, 1), z_dir=(-1, 0, 0))) as chamfer2_piece_16:
        Polygon((2, -CHAMFER2_SIZE), (2 + CHAMFER2_SIZE, 0), (2, 0), align=None)
    revolve(axis=Axis((-26.8, 5, -25.5), (0, 1, 0)), revolution_arc=90, mode=Mode.SUBTRACT)
    with BuildSketch(Plane(origin=(-17.87, 5, -25.5), x_dir=(-1, 0, 0), z_dir=(0, 0, -1))) as chamfer2_piece_17:
        Polygon((2 + CHAMFER2_SIZE, 0), (2, -CHAMFER2_SIZE), (2, 0), align=None)
    revolve(axis=Axis((-17.87, 5, -25.5), (0, 1, 0)), revolution_arc=90, mode=Mode.SUBTRACT)
    with BuildSketch(Plane(origin=(17.87, 5, -25.5), x_dir=(0, 0, 1), z_dir=(-1, 0, 0))) as chamfer2_piece_18:
        Polygon((2 + CHAMFER2_SIZE, 0), (2, -CHAMFER2_SIZE), (2, 0), align=None)
    revolve(axis=Axis((17.87, 5, -25.5), (0, 1, 0)), revolution_arc=90, mode=Mode.SUBTRACT)
    with BuildSketch(Plane(origin=(26.8, 5, -25.5), x_dir=(-1, 0, 0), z_dir=(0, 0, -1))) as chamfer2_piece_19:
        Polygon((2 + CHAMFER2_SIZE, 0), (2, -CHAMFER2_SIZE), (2, 0), align=None)
    revolve(axis=Axis((26.8, 5, -25.5), (0, 1, 0)), revolution_arc=90, mode=Mode.SUBTRACT)
    with BuildSketch(Plane(origin=(45.5, 5, -16.628508327), x_dir=(0.38057900366879954, 0, -0.9247484100913416), z_dir=(0.9247484100913416, 0, 0.38057900366879954))) as chamfer2_piece_20:
        Polygon((2 + CHAMFER2_SIZE, 0), (2, -CHAMFER2_SIZE), (2, 0), align=None)
    revolve(axis=Axis((45.5, 5, -16.628508327), (0, 1, 0)), revolution_arc=112.369552085, mode=Mode.SUBTRACT)
    with BuildSketch(Plane(origin=(45.5, 5, 16.628508327), x_dir=(-1, 0, 0), z_dir=(0, 0, -1))) as chamfer2_piece_21:
        Polygon((2 + CHAMFER2_SIZE, 0), (2, -CHAMFER2_SIZE), (2, 0), align=None)
    revolve(axis=Axis((45.5, 5, 16.628508327), (0, 1, 0)), revolution_arc=112.369552085, mode=Mode.SUBTRACT)
    with BuildSketch(Plane(origin=(4.465, 5, 25.5), x_dir=(0, 0, -1), z_dir=(1, 0, 0))) as chamfer2_piece_22:
        Polygon((2 + CHAMFER2_SIZE, 0), (2, -CHAMFER2_SIZE), (2, 0), align=None)
    revolve(axis=Axis((4.465, 5, 25.5), (0, 1, 0)), revolution_arc=90, mode=Mode.SUBTRACT)
    with BuildSketch(Plane(origin=(-24.8, 5, -25.5), x_dir=(0, -1, 0), z_dir=(0, 0, -1))) as chamfer2_piece_23:
        Polygon((CHAMFER2_SIZE, 0), (0, -CHAMFER2_SIZE), (0, 0), align=None)
    extrude(amount=5.785841494, mode=Mode.SUBTRACT)

    # Sketch4 → Cut-Extrude1 (cut, up to next)
    with BuildSketch(Plane(origin=(0, 5, 0), x_dir=(1, 0, 0), z_dir=(0, 1, 0)), mode=Mode.PRIVATE) as cut_extrude1_sk1:
        Rectangle(SKETCH4_W, SKETCH4_H)
    cut_extrude1_tool1 = extrude(cut_extrude1_sk1.sketch, amount=-CUT_EXTRUDE1_REACH, mode=Mode.PRIVATE) & part.part
    add(cut_extrude1_tool1.solids().sort_by_distance((0, 5, 0))[0], mode=Mode.SUBTRACT)

    # Fillet3
    fillet3_edges = [part.edges().sort_by_distance(p)[0] for p in [
        (35, 2.5, -15),
        (35, 2.5, 15),
        (-35, 2.5, 15),
        (-35, 2.5, -15),
    ]]
    fillet(fillet3_edges, radius=FILLET3_R)


solid = part.part
